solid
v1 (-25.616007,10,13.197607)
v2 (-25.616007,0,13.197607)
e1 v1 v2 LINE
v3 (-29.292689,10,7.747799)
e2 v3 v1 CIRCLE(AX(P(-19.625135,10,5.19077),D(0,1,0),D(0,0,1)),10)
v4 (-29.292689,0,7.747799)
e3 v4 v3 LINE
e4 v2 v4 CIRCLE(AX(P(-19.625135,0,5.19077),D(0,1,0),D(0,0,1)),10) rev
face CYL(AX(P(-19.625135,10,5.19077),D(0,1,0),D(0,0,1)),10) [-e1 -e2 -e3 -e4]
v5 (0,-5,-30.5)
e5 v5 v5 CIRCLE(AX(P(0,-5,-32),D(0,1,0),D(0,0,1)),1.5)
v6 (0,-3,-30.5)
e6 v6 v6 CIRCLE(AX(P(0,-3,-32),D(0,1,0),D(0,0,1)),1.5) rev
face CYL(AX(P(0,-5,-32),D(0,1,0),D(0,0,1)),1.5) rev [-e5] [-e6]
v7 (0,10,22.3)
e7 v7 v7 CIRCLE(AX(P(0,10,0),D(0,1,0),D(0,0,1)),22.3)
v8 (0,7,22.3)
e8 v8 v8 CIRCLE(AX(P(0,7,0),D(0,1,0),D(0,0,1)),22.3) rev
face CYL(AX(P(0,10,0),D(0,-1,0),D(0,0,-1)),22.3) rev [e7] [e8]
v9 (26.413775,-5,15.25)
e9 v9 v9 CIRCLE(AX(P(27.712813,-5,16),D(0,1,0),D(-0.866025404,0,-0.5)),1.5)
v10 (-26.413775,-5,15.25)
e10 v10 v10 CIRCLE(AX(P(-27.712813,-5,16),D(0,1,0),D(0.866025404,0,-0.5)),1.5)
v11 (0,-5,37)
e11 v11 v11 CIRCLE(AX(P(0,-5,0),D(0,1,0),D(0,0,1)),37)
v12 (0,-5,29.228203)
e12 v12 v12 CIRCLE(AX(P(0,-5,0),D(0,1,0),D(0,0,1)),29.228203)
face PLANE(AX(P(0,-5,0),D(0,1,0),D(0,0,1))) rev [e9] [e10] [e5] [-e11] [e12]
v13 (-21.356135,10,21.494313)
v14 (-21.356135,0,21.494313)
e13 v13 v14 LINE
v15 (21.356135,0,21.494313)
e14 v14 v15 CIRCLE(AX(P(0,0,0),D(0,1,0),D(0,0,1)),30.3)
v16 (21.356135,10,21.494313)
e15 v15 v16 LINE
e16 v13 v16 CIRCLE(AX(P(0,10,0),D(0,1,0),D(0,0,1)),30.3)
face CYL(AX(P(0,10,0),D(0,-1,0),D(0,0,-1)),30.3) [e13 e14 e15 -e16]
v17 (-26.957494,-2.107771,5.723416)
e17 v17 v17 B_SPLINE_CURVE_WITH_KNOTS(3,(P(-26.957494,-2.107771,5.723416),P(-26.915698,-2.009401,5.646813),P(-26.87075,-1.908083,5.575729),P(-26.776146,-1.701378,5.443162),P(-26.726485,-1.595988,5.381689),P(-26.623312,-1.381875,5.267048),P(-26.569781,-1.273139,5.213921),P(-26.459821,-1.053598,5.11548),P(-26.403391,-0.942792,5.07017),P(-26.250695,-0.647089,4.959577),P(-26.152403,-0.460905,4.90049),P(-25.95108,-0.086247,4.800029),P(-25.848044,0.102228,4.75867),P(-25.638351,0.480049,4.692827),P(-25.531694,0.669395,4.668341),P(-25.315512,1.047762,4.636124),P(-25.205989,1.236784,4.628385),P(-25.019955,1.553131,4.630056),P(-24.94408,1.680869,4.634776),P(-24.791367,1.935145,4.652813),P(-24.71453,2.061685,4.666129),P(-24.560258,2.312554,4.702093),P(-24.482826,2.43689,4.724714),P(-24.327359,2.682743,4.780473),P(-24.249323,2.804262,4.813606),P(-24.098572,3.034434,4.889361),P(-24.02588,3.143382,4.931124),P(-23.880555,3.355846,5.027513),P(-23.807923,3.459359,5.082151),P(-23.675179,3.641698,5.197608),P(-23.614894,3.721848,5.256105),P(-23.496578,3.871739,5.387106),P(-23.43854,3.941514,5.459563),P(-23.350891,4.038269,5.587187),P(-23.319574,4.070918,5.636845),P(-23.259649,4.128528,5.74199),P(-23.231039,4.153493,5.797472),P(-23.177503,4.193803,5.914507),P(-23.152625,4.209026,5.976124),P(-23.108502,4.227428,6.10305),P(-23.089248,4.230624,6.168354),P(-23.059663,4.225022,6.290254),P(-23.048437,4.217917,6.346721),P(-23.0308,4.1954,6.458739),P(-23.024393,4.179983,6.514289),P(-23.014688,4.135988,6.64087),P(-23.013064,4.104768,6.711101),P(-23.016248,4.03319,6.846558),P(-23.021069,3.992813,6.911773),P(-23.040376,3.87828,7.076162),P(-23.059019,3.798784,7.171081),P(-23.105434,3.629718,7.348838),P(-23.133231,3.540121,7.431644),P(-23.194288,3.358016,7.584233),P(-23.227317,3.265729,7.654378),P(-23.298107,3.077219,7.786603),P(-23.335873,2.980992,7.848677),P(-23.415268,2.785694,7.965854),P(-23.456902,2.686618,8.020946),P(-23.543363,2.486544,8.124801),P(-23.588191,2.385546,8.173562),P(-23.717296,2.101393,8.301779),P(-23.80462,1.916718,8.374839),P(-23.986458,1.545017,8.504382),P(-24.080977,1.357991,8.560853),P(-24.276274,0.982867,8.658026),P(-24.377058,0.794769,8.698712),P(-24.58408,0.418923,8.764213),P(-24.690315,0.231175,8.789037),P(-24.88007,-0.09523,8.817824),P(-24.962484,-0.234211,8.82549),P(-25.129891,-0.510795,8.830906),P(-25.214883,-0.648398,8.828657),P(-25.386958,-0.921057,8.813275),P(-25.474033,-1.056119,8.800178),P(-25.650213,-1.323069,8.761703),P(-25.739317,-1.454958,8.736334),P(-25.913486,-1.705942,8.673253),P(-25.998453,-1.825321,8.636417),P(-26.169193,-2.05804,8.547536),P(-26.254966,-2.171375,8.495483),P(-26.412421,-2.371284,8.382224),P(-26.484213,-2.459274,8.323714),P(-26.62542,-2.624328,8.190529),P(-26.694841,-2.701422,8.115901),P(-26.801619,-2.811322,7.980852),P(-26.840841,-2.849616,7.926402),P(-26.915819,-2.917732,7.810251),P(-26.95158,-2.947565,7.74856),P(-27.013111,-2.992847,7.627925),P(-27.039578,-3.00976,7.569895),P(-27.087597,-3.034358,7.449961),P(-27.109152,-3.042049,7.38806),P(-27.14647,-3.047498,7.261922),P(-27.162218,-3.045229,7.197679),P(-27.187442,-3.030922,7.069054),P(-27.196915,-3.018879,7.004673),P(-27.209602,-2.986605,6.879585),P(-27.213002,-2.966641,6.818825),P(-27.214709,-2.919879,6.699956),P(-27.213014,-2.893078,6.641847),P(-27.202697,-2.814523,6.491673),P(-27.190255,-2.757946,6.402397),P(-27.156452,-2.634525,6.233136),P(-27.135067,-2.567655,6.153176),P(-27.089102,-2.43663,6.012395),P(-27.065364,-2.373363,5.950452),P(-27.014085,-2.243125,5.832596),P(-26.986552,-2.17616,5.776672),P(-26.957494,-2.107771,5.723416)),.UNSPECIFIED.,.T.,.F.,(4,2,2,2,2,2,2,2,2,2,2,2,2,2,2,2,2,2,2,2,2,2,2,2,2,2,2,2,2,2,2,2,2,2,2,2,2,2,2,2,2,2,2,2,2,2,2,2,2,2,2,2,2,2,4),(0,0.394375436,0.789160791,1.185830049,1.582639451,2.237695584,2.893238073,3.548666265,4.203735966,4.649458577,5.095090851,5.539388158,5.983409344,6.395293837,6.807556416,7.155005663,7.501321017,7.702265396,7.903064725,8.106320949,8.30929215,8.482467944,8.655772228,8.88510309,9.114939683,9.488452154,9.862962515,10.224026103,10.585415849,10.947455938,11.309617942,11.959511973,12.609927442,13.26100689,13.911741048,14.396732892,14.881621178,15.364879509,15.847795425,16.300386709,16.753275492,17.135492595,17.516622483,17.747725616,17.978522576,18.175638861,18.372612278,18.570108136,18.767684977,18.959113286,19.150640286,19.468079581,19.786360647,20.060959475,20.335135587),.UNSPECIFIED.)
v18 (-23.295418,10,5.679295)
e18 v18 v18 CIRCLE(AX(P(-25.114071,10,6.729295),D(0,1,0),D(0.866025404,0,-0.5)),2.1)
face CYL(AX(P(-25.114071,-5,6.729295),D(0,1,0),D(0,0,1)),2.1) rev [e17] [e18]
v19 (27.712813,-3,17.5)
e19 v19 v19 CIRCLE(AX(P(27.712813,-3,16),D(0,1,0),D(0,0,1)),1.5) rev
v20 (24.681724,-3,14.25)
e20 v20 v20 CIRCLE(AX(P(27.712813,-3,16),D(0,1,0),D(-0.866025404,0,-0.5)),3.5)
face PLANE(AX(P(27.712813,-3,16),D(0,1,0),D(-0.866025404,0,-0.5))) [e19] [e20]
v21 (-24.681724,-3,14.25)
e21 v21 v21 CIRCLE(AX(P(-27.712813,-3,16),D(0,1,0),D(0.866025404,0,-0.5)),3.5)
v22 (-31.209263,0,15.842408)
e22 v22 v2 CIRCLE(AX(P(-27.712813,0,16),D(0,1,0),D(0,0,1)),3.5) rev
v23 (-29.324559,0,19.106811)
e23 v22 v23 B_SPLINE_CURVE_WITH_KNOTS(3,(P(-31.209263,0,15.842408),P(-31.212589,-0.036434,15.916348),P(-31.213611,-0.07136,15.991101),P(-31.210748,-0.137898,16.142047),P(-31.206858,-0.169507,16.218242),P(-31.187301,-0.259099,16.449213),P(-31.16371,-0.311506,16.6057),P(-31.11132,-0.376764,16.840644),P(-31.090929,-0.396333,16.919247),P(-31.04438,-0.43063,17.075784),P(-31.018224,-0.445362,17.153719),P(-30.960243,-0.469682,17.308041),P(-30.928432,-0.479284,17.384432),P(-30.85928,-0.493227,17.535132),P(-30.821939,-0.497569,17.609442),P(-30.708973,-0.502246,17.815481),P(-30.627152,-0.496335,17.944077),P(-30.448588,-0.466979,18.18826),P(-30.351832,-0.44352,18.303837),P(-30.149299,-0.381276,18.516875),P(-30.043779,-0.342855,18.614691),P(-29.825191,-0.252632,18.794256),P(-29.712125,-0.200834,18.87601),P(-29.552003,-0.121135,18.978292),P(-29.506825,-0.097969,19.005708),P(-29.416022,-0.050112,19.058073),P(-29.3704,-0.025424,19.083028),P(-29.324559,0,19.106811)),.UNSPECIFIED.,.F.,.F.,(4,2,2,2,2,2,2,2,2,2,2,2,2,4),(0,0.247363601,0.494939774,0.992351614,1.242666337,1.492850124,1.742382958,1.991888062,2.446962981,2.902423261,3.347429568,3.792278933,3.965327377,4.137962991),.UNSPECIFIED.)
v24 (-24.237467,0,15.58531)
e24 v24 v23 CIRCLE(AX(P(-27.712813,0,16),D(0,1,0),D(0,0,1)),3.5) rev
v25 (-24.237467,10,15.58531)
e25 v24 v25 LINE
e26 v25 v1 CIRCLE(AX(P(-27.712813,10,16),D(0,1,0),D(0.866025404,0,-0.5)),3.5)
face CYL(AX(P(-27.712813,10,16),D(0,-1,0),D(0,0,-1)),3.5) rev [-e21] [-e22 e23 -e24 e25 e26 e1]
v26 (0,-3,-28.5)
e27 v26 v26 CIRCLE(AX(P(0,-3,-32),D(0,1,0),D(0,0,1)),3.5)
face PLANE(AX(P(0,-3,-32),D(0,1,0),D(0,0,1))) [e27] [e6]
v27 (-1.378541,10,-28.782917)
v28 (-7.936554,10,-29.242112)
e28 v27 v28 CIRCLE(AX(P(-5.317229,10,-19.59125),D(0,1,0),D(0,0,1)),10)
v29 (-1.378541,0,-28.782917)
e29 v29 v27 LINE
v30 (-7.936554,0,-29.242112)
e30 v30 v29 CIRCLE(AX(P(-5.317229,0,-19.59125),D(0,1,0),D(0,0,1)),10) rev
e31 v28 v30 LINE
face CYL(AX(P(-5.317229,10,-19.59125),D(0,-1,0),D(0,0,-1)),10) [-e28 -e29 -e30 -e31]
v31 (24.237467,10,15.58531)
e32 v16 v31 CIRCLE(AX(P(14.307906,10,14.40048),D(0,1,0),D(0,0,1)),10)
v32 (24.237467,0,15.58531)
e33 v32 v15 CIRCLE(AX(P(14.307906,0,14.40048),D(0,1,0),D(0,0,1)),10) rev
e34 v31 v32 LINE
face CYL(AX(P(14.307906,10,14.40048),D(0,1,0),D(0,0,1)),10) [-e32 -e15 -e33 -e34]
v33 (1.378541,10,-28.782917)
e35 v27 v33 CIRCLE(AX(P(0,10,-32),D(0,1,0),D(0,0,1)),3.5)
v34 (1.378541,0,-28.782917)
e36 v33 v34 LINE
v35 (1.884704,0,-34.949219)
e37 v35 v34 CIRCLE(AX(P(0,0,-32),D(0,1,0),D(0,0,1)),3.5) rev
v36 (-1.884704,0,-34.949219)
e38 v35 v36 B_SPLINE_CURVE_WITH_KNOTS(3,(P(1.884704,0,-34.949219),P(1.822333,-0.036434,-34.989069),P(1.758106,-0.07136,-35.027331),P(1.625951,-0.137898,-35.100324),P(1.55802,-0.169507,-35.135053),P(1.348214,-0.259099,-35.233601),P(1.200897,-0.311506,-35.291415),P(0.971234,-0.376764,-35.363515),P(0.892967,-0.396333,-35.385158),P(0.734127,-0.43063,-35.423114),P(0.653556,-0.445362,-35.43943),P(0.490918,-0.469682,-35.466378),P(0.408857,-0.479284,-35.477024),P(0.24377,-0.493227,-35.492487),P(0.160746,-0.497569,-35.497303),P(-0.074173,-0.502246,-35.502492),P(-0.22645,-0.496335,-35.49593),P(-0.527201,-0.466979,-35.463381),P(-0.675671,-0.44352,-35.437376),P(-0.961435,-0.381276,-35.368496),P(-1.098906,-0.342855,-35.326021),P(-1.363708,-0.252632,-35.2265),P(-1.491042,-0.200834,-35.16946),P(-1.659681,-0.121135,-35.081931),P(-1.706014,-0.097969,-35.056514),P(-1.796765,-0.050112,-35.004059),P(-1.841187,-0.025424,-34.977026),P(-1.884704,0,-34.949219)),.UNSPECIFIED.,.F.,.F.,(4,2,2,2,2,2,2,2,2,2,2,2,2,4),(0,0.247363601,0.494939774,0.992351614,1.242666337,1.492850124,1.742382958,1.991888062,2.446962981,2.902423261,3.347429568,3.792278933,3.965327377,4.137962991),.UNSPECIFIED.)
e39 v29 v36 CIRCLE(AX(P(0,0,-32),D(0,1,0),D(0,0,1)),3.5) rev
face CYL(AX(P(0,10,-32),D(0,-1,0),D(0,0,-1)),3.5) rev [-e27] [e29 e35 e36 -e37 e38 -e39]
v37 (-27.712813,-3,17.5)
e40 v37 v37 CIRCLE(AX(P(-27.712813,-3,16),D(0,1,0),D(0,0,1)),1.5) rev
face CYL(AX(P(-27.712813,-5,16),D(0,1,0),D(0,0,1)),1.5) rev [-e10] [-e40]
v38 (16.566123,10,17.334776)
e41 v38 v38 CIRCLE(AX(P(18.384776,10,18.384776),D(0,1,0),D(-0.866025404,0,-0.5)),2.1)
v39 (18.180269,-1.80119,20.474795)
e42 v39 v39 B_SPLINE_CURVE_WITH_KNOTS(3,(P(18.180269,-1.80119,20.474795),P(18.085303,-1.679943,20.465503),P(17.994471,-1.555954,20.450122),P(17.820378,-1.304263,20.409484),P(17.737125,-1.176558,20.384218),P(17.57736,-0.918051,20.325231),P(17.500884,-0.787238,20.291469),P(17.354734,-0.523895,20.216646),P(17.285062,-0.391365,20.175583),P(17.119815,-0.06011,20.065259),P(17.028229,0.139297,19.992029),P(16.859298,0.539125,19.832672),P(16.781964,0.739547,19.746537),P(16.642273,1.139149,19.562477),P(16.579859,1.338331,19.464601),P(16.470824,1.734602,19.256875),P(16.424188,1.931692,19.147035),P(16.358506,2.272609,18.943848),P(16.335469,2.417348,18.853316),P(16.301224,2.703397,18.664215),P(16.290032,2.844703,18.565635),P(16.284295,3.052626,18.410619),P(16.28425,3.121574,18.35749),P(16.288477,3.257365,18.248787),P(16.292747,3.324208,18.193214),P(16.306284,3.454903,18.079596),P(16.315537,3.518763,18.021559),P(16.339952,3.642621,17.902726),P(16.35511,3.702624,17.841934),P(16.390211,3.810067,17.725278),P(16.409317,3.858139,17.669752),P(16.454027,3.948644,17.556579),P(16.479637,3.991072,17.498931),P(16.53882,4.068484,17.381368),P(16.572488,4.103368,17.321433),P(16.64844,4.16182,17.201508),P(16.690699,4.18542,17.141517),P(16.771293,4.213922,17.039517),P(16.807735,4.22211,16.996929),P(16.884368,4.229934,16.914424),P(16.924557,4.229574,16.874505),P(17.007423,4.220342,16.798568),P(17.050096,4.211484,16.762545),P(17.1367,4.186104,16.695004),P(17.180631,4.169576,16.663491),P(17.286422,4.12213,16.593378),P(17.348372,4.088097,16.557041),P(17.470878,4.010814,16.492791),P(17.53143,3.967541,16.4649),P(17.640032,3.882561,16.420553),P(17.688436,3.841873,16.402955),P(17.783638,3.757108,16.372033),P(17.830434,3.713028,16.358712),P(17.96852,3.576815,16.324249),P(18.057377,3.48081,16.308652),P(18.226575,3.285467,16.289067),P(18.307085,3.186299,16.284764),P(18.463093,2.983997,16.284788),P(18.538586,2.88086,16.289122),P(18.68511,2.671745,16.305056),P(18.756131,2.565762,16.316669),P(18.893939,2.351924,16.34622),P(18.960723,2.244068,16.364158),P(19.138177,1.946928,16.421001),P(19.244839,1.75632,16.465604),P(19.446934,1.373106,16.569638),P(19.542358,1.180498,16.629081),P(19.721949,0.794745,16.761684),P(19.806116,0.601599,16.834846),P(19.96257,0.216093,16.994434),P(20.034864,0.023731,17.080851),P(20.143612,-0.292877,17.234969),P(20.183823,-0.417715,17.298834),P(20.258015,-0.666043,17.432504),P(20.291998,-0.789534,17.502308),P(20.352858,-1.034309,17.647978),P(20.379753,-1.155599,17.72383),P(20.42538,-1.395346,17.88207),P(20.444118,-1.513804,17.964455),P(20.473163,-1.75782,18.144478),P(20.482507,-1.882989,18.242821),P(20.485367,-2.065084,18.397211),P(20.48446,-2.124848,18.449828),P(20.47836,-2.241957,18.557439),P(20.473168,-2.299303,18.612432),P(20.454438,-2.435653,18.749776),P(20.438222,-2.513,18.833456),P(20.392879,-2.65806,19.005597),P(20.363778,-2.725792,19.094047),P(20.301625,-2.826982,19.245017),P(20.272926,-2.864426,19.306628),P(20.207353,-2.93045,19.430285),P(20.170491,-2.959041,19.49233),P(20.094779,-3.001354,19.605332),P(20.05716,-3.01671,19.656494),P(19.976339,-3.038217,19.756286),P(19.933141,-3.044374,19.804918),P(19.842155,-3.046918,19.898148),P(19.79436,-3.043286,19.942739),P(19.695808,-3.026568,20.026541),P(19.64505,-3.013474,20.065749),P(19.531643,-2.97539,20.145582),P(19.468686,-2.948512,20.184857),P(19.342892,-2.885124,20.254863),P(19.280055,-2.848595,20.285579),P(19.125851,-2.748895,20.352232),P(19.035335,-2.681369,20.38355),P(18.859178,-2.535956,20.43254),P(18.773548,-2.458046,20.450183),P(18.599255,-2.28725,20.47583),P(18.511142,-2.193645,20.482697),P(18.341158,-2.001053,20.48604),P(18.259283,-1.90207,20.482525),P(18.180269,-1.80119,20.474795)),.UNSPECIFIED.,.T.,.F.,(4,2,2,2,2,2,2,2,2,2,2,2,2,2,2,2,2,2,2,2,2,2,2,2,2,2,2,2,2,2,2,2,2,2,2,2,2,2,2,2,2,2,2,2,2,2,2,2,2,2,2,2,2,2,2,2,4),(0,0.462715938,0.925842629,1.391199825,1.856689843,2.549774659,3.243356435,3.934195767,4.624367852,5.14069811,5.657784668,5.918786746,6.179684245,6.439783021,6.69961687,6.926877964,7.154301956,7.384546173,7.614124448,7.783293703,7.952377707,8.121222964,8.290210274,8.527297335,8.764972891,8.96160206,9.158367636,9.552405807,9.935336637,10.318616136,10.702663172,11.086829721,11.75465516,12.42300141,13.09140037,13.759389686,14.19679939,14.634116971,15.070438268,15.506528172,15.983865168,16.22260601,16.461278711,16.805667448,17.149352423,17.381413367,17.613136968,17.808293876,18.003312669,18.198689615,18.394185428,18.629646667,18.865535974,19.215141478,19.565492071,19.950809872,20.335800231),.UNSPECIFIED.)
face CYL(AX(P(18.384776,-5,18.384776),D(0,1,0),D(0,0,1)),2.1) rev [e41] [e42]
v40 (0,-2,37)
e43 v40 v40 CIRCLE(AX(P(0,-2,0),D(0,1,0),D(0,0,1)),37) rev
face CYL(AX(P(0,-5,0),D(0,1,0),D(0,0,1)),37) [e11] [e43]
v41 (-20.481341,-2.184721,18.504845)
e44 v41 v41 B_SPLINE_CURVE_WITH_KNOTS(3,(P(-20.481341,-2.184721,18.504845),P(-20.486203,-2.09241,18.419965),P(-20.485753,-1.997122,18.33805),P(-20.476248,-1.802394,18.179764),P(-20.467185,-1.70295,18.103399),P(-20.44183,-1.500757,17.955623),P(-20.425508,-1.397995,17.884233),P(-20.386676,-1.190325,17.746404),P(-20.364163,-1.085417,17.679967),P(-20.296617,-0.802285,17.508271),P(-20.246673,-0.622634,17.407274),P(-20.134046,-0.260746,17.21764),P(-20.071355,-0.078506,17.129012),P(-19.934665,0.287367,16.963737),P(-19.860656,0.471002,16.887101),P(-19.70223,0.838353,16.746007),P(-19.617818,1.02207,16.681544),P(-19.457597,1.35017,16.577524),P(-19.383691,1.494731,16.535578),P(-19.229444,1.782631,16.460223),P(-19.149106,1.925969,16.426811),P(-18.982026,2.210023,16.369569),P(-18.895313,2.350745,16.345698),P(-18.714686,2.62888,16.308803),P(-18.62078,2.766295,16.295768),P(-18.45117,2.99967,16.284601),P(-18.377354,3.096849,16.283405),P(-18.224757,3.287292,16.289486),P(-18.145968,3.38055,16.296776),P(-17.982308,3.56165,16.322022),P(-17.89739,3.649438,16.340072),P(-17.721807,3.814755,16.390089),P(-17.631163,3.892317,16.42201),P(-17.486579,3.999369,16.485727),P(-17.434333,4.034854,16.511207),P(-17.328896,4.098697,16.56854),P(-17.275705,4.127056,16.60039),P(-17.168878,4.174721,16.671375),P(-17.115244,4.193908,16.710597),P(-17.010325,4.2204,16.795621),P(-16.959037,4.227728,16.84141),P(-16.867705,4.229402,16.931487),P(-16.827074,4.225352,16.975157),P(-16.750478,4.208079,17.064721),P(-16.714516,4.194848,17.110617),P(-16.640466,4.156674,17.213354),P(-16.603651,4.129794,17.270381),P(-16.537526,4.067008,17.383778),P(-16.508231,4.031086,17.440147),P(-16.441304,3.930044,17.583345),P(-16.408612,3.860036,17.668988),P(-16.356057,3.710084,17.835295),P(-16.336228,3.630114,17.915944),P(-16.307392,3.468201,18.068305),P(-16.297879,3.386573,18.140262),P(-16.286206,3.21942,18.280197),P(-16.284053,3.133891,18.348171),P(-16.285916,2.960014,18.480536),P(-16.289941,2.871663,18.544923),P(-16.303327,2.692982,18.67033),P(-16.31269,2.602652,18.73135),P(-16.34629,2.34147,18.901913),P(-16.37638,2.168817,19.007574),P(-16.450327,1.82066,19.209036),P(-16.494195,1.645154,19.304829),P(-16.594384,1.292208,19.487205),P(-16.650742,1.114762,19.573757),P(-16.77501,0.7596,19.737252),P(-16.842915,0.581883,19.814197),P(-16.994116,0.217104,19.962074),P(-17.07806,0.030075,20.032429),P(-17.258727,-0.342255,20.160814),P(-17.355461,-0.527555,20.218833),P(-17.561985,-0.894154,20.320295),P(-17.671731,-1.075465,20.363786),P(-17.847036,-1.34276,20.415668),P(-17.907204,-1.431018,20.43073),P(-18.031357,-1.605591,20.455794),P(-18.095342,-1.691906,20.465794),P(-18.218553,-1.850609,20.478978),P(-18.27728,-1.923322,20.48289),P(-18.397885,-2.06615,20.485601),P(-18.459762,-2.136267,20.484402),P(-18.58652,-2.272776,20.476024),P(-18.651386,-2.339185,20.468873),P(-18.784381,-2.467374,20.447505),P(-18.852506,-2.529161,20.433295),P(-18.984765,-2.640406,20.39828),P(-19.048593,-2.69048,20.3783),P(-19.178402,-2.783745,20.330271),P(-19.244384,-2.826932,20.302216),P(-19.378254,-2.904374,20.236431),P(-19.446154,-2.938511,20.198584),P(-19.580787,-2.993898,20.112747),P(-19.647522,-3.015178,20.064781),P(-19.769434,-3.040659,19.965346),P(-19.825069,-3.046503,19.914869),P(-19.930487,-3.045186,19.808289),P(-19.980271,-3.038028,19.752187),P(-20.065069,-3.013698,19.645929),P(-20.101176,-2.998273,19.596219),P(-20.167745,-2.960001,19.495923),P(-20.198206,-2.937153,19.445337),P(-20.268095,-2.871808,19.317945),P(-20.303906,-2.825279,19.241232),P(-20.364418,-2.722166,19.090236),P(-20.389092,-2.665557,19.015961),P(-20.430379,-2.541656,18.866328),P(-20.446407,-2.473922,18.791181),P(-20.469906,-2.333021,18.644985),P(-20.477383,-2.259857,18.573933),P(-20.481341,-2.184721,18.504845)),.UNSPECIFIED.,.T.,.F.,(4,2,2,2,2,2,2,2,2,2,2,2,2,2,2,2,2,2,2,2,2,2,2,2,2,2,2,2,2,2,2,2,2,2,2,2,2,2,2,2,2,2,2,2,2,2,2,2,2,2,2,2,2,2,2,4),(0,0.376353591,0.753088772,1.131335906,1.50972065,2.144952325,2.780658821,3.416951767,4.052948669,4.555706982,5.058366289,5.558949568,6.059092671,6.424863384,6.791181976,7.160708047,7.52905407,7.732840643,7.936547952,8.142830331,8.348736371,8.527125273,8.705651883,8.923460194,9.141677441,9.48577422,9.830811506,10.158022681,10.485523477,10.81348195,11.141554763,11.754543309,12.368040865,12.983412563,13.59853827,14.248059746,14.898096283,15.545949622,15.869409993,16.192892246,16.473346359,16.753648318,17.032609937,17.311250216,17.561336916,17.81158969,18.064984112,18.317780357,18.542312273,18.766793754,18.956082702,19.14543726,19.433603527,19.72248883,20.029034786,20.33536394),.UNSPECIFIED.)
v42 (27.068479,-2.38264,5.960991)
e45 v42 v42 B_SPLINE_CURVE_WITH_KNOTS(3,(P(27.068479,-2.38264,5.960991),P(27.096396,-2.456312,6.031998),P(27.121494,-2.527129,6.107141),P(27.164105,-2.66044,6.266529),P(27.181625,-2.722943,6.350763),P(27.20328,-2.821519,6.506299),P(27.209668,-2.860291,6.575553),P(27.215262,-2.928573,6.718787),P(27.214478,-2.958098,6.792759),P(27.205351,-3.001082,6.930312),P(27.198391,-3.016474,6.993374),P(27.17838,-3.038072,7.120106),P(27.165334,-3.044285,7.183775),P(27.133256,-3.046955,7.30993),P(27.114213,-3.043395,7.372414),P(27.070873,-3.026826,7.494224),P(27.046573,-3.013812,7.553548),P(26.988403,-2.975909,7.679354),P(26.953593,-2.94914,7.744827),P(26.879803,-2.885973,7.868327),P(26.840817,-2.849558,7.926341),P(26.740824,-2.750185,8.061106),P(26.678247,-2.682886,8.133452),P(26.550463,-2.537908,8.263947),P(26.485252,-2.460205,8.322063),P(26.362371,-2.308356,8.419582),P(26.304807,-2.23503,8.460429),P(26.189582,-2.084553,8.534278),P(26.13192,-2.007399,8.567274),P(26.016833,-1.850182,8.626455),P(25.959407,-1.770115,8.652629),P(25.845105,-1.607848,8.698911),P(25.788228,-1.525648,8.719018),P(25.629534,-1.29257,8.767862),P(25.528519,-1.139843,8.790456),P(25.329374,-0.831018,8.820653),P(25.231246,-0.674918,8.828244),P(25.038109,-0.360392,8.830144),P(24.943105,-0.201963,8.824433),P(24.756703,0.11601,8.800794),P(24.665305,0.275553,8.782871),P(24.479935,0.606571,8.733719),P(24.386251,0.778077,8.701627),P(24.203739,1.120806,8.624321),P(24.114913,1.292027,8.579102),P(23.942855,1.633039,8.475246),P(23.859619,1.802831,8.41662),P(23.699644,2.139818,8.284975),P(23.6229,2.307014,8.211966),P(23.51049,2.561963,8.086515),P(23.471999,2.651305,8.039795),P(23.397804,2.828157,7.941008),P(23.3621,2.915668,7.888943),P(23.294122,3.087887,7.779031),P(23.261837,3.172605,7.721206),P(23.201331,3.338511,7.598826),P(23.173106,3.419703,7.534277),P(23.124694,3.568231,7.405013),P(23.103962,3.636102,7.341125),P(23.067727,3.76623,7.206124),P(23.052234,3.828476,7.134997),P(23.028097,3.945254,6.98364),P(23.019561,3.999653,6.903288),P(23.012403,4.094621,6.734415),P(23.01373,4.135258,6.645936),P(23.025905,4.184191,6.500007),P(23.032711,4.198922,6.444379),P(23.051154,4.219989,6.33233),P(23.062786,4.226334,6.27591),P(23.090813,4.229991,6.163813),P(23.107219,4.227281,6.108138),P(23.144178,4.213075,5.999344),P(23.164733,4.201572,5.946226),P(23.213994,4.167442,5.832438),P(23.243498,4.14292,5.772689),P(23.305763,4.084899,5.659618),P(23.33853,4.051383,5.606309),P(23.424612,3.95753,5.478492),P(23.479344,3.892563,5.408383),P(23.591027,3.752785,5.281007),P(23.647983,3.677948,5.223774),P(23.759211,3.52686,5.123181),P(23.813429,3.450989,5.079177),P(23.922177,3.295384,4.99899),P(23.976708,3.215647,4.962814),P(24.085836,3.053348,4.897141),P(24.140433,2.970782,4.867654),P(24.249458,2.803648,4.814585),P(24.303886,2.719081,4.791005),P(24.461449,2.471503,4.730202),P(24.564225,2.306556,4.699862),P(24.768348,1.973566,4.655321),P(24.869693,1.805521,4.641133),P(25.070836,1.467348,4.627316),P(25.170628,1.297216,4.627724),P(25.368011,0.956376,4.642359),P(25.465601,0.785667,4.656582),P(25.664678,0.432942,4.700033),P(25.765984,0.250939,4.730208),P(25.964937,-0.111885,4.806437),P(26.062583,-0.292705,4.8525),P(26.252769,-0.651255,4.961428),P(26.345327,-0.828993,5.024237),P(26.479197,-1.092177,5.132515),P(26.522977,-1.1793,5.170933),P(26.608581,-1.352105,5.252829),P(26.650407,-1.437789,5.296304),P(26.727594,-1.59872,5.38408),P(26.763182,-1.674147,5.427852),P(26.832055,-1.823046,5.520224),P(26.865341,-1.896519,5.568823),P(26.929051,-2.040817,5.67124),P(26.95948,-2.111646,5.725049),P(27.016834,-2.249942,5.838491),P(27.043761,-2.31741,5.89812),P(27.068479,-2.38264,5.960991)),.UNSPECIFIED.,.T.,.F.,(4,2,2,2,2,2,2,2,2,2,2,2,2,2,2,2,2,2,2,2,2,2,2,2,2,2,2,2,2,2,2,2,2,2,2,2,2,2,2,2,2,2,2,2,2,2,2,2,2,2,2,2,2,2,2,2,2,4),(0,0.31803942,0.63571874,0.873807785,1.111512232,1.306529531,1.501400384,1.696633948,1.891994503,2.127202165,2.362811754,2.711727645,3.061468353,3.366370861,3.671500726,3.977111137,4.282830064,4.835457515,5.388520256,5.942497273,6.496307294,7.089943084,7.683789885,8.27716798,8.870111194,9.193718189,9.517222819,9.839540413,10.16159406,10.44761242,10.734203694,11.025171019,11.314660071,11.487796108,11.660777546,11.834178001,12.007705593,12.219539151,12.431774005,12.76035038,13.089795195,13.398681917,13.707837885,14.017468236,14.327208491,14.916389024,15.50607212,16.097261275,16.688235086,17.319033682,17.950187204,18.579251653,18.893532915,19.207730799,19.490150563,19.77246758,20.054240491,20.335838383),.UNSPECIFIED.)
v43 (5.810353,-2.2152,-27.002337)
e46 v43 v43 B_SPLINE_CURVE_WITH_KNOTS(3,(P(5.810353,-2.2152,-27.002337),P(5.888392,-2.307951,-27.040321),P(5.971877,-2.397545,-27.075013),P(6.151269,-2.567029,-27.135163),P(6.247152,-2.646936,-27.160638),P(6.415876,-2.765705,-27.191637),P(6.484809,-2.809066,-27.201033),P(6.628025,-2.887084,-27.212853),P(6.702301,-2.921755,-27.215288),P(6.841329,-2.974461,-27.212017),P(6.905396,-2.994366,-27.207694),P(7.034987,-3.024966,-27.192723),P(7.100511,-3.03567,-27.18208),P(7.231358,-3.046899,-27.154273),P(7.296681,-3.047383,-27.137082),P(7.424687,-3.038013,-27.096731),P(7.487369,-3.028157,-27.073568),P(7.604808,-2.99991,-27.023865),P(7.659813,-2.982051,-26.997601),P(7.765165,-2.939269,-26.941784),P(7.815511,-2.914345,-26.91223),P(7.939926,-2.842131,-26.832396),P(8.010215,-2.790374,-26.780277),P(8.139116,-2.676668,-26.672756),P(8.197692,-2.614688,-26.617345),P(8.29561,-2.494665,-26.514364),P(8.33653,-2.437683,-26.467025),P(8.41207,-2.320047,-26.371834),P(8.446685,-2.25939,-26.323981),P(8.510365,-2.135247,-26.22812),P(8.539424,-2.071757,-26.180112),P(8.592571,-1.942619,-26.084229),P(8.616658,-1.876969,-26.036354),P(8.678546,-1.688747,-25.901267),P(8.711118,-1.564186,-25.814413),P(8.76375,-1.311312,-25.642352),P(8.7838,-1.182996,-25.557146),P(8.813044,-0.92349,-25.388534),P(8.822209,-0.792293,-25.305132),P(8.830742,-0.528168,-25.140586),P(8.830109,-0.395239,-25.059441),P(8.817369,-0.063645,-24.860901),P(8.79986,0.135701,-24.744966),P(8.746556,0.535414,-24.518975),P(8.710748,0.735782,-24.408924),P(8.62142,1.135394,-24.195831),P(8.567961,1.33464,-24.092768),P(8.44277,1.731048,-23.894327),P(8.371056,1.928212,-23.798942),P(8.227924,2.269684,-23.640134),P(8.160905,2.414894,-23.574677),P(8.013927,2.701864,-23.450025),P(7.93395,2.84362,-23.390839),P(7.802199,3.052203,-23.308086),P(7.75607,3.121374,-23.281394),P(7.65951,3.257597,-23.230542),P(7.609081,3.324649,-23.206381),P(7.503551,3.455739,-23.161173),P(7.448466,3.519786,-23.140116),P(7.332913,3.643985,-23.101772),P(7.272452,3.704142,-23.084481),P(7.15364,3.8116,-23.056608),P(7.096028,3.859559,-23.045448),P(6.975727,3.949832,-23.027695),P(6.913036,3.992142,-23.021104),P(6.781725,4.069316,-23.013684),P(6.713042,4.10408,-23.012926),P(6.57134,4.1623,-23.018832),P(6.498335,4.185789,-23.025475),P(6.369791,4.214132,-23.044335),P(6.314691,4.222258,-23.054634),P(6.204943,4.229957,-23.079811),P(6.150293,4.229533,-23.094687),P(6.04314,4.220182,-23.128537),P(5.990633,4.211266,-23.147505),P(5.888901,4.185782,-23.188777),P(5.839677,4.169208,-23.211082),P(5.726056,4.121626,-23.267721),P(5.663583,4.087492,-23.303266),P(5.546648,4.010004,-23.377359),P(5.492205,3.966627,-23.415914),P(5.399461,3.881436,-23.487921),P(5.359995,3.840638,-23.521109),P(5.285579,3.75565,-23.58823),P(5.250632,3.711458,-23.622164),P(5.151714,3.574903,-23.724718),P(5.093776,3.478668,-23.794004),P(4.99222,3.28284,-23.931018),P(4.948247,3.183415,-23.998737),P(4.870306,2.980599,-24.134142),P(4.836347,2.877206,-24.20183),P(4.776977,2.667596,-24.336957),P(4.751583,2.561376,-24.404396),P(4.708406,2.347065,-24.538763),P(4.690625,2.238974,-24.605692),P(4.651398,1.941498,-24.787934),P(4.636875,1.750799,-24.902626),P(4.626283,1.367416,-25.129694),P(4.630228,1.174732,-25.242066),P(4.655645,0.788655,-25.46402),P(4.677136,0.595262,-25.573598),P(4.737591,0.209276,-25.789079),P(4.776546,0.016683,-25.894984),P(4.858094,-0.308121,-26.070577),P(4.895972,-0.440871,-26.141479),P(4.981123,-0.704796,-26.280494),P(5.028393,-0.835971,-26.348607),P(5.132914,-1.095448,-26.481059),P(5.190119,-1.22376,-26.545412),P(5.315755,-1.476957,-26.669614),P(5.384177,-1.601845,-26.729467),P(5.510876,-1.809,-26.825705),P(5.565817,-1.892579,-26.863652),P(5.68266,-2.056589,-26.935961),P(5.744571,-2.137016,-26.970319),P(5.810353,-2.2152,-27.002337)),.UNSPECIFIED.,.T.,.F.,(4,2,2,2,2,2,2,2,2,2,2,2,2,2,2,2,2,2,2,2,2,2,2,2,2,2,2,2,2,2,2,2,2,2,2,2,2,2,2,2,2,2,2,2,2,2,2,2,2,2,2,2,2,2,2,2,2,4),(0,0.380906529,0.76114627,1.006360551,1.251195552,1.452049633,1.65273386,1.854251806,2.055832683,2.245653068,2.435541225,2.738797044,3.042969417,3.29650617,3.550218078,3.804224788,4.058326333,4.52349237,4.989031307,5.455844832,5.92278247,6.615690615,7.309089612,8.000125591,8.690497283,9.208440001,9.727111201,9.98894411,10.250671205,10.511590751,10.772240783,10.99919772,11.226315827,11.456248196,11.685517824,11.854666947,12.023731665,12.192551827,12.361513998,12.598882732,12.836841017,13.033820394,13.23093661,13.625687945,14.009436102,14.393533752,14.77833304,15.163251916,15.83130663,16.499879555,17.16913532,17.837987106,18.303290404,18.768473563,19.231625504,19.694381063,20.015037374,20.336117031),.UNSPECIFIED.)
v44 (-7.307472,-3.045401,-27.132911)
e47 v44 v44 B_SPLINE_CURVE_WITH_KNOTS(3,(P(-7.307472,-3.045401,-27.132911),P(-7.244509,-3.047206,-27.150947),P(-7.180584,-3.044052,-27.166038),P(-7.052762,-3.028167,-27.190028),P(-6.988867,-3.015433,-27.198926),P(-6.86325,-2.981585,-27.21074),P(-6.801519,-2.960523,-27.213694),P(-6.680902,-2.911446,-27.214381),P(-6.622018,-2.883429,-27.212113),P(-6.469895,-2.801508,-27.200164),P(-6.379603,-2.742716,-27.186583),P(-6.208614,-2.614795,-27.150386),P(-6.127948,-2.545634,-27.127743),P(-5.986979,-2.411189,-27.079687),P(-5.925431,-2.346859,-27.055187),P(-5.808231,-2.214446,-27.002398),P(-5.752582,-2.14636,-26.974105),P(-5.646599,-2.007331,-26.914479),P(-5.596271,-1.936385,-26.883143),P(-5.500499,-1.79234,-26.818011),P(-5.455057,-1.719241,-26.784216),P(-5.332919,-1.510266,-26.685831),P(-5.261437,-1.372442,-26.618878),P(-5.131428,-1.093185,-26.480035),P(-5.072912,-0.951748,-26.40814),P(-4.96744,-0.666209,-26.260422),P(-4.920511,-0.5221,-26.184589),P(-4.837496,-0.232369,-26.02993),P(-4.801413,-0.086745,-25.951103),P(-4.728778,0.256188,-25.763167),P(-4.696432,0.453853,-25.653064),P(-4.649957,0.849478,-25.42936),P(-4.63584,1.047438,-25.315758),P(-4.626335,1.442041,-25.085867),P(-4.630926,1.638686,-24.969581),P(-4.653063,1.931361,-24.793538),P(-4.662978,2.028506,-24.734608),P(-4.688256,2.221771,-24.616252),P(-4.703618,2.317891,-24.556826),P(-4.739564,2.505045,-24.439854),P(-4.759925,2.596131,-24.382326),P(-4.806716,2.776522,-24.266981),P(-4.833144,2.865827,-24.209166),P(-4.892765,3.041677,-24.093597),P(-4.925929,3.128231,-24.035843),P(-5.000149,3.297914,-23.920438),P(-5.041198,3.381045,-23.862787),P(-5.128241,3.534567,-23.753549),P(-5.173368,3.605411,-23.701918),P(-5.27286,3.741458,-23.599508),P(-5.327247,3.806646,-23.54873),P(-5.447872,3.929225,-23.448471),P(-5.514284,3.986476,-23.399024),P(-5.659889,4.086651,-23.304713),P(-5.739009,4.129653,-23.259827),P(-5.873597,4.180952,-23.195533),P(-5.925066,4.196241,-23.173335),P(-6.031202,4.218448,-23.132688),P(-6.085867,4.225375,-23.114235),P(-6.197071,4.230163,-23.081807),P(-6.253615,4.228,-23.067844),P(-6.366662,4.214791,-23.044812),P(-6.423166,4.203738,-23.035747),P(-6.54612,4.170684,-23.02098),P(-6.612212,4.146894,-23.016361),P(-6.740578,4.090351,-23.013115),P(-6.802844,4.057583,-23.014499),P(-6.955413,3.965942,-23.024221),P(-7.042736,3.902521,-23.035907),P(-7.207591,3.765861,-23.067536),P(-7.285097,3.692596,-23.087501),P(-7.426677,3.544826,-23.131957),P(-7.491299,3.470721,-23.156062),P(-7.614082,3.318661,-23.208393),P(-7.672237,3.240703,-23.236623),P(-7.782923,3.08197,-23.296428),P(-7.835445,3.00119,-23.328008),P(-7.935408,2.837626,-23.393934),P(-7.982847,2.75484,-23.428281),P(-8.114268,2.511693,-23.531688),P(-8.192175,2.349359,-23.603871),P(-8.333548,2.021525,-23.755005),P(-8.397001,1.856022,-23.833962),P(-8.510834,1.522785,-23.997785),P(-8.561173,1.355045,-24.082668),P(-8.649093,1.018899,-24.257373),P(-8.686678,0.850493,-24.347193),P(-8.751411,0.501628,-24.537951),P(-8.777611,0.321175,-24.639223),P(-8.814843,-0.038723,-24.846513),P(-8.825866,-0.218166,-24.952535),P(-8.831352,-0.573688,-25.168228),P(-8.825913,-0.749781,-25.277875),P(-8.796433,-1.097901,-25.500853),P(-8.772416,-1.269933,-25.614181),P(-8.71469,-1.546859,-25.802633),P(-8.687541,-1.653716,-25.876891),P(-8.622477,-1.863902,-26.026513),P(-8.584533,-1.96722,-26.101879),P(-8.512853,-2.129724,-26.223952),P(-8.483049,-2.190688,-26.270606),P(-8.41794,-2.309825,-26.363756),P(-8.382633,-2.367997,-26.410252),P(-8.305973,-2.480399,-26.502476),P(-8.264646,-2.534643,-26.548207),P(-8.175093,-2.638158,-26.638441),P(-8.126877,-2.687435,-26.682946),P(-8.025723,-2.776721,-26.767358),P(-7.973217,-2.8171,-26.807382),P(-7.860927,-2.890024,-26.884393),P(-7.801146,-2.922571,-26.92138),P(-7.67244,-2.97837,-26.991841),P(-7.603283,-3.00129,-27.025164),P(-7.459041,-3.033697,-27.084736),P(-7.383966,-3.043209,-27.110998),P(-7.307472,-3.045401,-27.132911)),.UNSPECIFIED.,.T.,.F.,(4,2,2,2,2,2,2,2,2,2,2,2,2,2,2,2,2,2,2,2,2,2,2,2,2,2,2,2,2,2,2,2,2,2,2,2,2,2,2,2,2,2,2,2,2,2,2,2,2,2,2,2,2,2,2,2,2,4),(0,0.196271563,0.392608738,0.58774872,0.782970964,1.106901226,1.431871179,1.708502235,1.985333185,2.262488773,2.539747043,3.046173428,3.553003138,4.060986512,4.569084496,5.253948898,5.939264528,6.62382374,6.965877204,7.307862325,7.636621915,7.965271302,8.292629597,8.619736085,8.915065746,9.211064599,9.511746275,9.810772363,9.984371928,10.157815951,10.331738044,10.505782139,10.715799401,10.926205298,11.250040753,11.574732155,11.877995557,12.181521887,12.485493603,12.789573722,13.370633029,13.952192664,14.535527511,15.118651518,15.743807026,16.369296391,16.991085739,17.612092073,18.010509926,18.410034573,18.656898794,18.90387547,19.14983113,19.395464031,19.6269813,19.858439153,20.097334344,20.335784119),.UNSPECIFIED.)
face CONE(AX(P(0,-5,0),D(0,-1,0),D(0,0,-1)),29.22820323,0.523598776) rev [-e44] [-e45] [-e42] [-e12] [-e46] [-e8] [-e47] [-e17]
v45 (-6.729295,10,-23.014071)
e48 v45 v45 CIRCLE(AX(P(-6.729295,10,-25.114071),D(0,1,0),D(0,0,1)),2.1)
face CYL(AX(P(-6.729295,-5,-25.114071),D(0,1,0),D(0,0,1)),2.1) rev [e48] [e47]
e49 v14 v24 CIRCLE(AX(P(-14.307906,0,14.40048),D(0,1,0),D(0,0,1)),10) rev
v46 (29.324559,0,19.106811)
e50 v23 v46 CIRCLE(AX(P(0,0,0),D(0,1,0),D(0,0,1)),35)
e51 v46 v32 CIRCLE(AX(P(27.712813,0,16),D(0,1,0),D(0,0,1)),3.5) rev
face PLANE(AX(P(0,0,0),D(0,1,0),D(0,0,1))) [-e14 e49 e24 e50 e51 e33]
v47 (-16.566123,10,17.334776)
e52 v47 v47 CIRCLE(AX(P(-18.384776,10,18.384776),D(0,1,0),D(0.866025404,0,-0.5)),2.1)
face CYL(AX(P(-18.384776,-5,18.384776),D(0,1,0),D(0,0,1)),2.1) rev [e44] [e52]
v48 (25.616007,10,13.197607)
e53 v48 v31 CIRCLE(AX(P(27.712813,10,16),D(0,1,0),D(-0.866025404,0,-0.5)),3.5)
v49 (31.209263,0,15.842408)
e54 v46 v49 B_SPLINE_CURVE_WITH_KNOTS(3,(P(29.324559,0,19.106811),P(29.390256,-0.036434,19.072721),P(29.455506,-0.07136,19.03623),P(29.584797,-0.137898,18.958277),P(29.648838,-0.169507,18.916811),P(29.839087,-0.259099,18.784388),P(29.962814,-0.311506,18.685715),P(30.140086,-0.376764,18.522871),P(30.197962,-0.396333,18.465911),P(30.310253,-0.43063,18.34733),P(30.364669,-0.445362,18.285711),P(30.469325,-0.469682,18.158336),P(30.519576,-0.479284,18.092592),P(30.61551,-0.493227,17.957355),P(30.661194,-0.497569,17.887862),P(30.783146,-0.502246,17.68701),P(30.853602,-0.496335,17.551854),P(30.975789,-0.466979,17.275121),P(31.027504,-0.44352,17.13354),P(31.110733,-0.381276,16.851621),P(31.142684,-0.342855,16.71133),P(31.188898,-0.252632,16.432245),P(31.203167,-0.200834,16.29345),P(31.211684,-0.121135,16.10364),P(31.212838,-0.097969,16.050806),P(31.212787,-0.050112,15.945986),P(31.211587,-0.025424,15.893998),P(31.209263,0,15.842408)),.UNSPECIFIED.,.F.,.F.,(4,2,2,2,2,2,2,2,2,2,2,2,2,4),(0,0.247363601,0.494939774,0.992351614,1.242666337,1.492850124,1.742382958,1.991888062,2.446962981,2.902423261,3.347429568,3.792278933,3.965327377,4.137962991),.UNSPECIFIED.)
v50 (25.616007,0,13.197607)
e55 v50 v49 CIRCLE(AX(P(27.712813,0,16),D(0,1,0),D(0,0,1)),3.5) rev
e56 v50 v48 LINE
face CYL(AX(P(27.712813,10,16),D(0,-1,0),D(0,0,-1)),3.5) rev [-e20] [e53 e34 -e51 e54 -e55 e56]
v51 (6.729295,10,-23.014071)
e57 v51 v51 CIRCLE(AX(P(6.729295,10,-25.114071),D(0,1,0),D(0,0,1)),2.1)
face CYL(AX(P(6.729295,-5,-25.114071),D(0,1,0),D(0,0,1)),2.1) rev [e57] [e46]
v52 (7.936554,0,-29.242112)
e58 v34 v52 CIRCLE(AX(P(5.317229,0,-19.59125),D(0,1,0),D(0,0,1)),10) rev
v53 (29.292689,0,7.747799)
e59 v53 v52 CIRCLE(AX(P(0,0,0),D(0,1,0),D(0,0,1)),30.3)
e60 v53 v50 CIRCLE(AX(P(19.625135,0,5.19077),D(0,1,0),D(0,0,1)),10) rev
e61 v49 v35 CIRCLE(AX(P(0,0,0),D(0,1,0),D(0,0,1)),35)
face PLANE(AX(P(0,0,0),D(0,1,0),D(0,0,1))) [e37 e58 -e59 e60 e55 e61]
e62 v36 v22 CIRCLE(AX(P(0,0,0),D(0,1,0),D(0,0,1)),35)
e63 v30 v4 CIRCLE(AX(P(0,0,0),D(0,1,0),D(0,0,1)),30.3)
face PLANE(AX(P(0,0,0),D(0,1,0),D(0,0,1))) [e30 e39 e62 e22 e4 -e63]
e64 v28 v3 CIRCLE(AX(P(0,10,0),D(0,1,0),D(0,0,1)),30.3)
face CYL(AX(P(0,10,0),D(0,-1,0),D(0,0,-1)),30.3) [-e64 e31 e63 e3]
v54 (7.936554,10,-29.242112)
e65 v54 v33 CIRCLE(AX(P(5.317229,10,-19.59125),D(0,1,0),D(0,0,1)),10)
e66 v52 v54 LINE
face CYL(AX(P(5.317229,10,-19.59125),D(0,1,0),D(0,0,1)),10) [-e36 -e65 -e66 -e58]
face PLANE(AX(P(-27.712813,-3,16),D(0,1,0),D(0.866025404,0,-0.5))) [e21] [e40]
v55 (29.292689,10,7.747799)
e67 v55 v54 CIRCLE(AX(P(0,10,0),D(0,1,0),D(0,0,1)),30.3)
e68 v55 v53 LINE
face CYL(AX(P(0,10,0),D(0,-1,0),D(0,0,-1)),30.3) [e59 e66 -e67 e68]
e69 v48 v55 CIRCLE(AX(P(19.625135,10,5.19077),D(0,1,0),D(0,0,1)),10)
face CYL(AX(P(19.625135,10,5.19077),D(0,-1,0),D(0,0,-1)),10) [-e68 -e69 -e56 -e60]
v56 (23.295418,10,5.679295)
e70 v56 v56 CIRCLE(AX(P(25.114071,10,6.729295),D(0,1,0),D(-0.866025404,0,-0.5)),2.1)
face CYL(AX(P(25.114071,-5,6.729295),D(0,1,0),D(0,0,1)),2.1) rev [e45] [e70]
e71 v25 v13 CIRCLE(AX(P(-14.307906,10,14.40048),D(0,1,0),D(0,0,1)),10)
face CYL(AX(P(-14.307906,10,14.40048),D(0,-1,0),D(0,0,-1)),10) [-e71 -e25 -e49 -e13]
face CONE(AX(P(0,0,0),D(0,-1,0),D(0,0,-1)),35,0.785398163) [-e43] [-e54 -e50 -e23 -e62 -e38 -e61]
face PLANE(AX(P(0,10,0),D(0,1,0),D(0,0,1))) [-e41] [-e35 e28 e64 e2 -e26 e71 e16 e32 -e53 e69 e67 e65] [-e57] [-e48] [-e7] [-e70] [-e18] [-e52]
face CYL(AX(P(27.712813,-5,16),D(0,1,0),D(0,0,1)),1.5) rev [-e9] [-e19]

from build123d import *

# Parameters (mm, degrees)
SKETCH1_R           = 30.3
SKETCH1_R_2         = 22.3
BOSS_EXTRUDE1_DEPTH = 10
BOSS_EXTRUDE2_START = -5
SKETCH2_R           = 37
SKETCH2_R_2         = 22.3
BOSS_EXTRUDE2_DEPTH = 5
SKETCH3_R           = 1.5
CUT_EXTRUDE1_DEPTH  = 54.272882407
CUT_EXTRUDE2_START  = -3
SKETCH4_R           = 3.5
CUT_EXTRUDE2_DEPTH  = 57.272882407
CIRPATTERN1_COUNT   = 3
CHAMFER1_SIZE       = 12
CHAMFER1_SIZE2      = 6.92820323
CHAMFER2_SIZE       = 2
SKETCH5_R           = 2.1
CUT_EXTRUDE3_DEPTH  = 55.433445737
CIRPATTERN2_COUNT   = 3
FILLET1_R           = 10


with BuildPart() as part:
    # Sketch1 → Boss-Extrude1 (new body)
    with BuildSketch(Plane(origin=(0, 0, 0), x_dir=(1, 0, 0), z_dir=(0, 1, 0))):
        with Locations(Location((0, 0, 0), (0, 0, 270))):
            Circle(SKETCH1_R)
        with Locations(Location((0, 0, 0), (0, 0, 270))):
            Circle(SKETCH1_R_2, mode=Mode.SUBTRACT)
    extrude(amount=BOSS_EXTRUDE1_DEPTH)

    # Sketch2 → Boss-Extrude2 (add)
    with BuildSketch(Plane(origin=(0, 0, 0), x_dir=(1, 0, 0), z_dir=(0, 1, 0)).offset(BOSS_EXTRUDE2_START)):
        with Locations(Location((0, 0, 0), (0, 0, 270))):
            Circle(SKETCH2_R)
        with Locations(Location((0, 0, 0), (0, 0, 270))):
            Circle(SKETCH2_R_2, mode=Mode.SUBTRACT)
    extrude(amount=BOSS_EXTRUDE2_DEPTH)

    # Sketch3 → Cut-Extrude1 (cut, through all)
    with BuildSketch(Plane(origin=(0, 0, 0), x_dir=(1, 0, 0), z_dir=(0, 1, 0))):
        with Locations(Location((0, 32, 0), (0, 0, 270))):
            Circle(SKETCH3_R)
    cut_extrude1 = extrude(amount=-CUT_EXTRUDE1_DEPTH, mode=Mode.SUBTRACT)

    # Sketch4 → Cut-Extrude2 (cut)
    with BuildSketch(Plane(origin=(0, 0, 0), x_dir=(1, 0, 0), z_dir=(0, 1, 0)).offset(CUT_EXTRUDE2_START)):
        with Locations(Location((0, 32, 0), (0, 0, 328.163304996))):
            Circle(SKETCH4_R)
    cut_extrude2 = extrude(amount=CUT_EXTRUDE2_DEPTH, mode=Mode.SUBTRACT)

    # CirPattern1: Cut-Extrude1, Cut-Extrude2 ×3 about axis
    cirpattern1_axis = Axis((0, 0, 0), (0, 1, 0))
    add([cut_extrude1.rotate(cirpattern1_axis, i * 360 / CIRPATTERN1_COUNT) for i in range(1, CIRPATTERN1_COUNT)], mode=Mode.SUBTRACT)
    add([cut_extrude2.rotate(cirpattern1_axis, i * 360 / CIRPATTERN1_COUNT) for i in range(1, CIRPATTERN1_COUNT)], mode=Mode.SUBTRACT)

    # Chamfer1
    chamfer1_edges = [part.edges().sort_by_distance(p)[0] for p in [
        (0, -5, -22.3),
    ]]
    chamfer1_side = [part.faces().sort_by_distance(p)[0] for p in [
        (0, 2.5, -22.3),
    ]]
    chamfer(chamfer1_edges, length=CHAMFER1_SIZE, length2=CHAMFER1_SIZE2, reference=chamfer1_side[0])

    # Chamfer2
    # the kernel refuses this chamfer: 2 mm, written as the material it takes off along each edge
    with BuildSketch(Plane(origin=(0, 0, 0), x_dir=(0, 0, 1), z_dir=(-1, 0, 0))) as chamfer2_piece_1:
        Polygon((37, -CHAMFER2_SIZE), (37 - CHAMFER2_SIZE, 0), (37, 0), align=None)
    revolve(axis=Axis((0, 0, 0), (0, 1, 0)), mode=Mode.SUBTRACT)

    # Sketch5 → Cut-Extrude3 (cut, through all)
    with BuildSketch(Plane(origin=(0, 10, 0), x_dir=(1, 0, 0), z_dir=(0, 1, 0))):
        with Locations(Location((6.729295173, 25.114071484, 0), (0, 0, 270))):
            Circle(SKETCH5_R)
        with Locations(Location((-6.729295173, 25.114071484, 0), (0, 0, 270))):
            Circle(SKETCH5_R)
    cut_extrude3 = extrude(amount=-CUT_EXTRUDE3_DEPTH, mode=Mode.SUBTRACT)

    # CirPattern2: Cut-Extrude3 ×3 about axis
    cirpattern2_axis = Axis((0, 0, 0), (0, 1, 0))
    for i in range(1, CIRPATTERN2_COUNT):
        add(cut_extrude3.rotate(cirpattern2_axis, i * 360 / CIRPATTERN2_COUNT), mode=Mode.SUBTRACT)

    # Fillet1
    # the kernel refuses this fillet: 10 mm, written as the material it takes off along each edge
    with BuildSketch(Plane(origin=(2.973442607, 0, -30.15375), x_dir=(0.9835455418768547, 0, 0.18066036381609613), z_dir=(0, 1, 0)), Plane(origin=(-27.600634823, 0, 12.501798166), x_dir=(-0.33531630641674726, 0, -0.9421056069523365), z_dir=(0, 1, 0)), Plane(origin=(-24.627192216, 22.615356127, 17.651951834), x_dir=(0.6482292354635445, 0, 0.7614452431333121), z_dir=(0, -1, 0)), Plane(origin=(27.600634823, 22.615356127, 12.501798166), x_dir=(0.33531630641249444, 0, -0.9421056069538499), z_dir=(0, -1, 0))) as fillet1_piece_1:
        with BuildLine():
            CenterArc((4.213445677, -9.965270497), FILLET1_R, 85.223468089, 38.380201644)
            ThreePointArc((-1.321003282, -1.636412549), (-0.534685103, -0.919772386), (0, 0))
            ThreePointArc((0, 0), (2.523071225, 0.105230393), (5.046142451, 0))
        make_face()
    extrude(amount=22.615356127, mode=Mode.SUBTRACT)
    with BuildSketch(Plane(origin=(-2.973442607, 22.615356127, -30.15375), x_dir=(0.758369035624482, 0, 0.6518254412079917), z_dir=(0, -1, 0)), Plane(origin=(24.627192216, 0, 17.651951834), x_dir=(-0.18531287310344324, 0, -0.9826795708989514), z_dir=(0, 1, 0))) as fillet1_piece_2:
        with BuildLine():
            CenterArc((5.107451253, 9.538012489), FILLET1_R, 214.135867483, 38.380201644)
            ThreePointArc((-3.169640839, 3.926439938), (-1.66670095, 1.897121448), (0, 0))
            ThreePointArc((0, 0), (1.051534082, 0.161695629), (2.103068163, 0))
        make_face()
    extrude(amount=22.615356127, mode=Mode.SUBTRACT)


solid = part.part
